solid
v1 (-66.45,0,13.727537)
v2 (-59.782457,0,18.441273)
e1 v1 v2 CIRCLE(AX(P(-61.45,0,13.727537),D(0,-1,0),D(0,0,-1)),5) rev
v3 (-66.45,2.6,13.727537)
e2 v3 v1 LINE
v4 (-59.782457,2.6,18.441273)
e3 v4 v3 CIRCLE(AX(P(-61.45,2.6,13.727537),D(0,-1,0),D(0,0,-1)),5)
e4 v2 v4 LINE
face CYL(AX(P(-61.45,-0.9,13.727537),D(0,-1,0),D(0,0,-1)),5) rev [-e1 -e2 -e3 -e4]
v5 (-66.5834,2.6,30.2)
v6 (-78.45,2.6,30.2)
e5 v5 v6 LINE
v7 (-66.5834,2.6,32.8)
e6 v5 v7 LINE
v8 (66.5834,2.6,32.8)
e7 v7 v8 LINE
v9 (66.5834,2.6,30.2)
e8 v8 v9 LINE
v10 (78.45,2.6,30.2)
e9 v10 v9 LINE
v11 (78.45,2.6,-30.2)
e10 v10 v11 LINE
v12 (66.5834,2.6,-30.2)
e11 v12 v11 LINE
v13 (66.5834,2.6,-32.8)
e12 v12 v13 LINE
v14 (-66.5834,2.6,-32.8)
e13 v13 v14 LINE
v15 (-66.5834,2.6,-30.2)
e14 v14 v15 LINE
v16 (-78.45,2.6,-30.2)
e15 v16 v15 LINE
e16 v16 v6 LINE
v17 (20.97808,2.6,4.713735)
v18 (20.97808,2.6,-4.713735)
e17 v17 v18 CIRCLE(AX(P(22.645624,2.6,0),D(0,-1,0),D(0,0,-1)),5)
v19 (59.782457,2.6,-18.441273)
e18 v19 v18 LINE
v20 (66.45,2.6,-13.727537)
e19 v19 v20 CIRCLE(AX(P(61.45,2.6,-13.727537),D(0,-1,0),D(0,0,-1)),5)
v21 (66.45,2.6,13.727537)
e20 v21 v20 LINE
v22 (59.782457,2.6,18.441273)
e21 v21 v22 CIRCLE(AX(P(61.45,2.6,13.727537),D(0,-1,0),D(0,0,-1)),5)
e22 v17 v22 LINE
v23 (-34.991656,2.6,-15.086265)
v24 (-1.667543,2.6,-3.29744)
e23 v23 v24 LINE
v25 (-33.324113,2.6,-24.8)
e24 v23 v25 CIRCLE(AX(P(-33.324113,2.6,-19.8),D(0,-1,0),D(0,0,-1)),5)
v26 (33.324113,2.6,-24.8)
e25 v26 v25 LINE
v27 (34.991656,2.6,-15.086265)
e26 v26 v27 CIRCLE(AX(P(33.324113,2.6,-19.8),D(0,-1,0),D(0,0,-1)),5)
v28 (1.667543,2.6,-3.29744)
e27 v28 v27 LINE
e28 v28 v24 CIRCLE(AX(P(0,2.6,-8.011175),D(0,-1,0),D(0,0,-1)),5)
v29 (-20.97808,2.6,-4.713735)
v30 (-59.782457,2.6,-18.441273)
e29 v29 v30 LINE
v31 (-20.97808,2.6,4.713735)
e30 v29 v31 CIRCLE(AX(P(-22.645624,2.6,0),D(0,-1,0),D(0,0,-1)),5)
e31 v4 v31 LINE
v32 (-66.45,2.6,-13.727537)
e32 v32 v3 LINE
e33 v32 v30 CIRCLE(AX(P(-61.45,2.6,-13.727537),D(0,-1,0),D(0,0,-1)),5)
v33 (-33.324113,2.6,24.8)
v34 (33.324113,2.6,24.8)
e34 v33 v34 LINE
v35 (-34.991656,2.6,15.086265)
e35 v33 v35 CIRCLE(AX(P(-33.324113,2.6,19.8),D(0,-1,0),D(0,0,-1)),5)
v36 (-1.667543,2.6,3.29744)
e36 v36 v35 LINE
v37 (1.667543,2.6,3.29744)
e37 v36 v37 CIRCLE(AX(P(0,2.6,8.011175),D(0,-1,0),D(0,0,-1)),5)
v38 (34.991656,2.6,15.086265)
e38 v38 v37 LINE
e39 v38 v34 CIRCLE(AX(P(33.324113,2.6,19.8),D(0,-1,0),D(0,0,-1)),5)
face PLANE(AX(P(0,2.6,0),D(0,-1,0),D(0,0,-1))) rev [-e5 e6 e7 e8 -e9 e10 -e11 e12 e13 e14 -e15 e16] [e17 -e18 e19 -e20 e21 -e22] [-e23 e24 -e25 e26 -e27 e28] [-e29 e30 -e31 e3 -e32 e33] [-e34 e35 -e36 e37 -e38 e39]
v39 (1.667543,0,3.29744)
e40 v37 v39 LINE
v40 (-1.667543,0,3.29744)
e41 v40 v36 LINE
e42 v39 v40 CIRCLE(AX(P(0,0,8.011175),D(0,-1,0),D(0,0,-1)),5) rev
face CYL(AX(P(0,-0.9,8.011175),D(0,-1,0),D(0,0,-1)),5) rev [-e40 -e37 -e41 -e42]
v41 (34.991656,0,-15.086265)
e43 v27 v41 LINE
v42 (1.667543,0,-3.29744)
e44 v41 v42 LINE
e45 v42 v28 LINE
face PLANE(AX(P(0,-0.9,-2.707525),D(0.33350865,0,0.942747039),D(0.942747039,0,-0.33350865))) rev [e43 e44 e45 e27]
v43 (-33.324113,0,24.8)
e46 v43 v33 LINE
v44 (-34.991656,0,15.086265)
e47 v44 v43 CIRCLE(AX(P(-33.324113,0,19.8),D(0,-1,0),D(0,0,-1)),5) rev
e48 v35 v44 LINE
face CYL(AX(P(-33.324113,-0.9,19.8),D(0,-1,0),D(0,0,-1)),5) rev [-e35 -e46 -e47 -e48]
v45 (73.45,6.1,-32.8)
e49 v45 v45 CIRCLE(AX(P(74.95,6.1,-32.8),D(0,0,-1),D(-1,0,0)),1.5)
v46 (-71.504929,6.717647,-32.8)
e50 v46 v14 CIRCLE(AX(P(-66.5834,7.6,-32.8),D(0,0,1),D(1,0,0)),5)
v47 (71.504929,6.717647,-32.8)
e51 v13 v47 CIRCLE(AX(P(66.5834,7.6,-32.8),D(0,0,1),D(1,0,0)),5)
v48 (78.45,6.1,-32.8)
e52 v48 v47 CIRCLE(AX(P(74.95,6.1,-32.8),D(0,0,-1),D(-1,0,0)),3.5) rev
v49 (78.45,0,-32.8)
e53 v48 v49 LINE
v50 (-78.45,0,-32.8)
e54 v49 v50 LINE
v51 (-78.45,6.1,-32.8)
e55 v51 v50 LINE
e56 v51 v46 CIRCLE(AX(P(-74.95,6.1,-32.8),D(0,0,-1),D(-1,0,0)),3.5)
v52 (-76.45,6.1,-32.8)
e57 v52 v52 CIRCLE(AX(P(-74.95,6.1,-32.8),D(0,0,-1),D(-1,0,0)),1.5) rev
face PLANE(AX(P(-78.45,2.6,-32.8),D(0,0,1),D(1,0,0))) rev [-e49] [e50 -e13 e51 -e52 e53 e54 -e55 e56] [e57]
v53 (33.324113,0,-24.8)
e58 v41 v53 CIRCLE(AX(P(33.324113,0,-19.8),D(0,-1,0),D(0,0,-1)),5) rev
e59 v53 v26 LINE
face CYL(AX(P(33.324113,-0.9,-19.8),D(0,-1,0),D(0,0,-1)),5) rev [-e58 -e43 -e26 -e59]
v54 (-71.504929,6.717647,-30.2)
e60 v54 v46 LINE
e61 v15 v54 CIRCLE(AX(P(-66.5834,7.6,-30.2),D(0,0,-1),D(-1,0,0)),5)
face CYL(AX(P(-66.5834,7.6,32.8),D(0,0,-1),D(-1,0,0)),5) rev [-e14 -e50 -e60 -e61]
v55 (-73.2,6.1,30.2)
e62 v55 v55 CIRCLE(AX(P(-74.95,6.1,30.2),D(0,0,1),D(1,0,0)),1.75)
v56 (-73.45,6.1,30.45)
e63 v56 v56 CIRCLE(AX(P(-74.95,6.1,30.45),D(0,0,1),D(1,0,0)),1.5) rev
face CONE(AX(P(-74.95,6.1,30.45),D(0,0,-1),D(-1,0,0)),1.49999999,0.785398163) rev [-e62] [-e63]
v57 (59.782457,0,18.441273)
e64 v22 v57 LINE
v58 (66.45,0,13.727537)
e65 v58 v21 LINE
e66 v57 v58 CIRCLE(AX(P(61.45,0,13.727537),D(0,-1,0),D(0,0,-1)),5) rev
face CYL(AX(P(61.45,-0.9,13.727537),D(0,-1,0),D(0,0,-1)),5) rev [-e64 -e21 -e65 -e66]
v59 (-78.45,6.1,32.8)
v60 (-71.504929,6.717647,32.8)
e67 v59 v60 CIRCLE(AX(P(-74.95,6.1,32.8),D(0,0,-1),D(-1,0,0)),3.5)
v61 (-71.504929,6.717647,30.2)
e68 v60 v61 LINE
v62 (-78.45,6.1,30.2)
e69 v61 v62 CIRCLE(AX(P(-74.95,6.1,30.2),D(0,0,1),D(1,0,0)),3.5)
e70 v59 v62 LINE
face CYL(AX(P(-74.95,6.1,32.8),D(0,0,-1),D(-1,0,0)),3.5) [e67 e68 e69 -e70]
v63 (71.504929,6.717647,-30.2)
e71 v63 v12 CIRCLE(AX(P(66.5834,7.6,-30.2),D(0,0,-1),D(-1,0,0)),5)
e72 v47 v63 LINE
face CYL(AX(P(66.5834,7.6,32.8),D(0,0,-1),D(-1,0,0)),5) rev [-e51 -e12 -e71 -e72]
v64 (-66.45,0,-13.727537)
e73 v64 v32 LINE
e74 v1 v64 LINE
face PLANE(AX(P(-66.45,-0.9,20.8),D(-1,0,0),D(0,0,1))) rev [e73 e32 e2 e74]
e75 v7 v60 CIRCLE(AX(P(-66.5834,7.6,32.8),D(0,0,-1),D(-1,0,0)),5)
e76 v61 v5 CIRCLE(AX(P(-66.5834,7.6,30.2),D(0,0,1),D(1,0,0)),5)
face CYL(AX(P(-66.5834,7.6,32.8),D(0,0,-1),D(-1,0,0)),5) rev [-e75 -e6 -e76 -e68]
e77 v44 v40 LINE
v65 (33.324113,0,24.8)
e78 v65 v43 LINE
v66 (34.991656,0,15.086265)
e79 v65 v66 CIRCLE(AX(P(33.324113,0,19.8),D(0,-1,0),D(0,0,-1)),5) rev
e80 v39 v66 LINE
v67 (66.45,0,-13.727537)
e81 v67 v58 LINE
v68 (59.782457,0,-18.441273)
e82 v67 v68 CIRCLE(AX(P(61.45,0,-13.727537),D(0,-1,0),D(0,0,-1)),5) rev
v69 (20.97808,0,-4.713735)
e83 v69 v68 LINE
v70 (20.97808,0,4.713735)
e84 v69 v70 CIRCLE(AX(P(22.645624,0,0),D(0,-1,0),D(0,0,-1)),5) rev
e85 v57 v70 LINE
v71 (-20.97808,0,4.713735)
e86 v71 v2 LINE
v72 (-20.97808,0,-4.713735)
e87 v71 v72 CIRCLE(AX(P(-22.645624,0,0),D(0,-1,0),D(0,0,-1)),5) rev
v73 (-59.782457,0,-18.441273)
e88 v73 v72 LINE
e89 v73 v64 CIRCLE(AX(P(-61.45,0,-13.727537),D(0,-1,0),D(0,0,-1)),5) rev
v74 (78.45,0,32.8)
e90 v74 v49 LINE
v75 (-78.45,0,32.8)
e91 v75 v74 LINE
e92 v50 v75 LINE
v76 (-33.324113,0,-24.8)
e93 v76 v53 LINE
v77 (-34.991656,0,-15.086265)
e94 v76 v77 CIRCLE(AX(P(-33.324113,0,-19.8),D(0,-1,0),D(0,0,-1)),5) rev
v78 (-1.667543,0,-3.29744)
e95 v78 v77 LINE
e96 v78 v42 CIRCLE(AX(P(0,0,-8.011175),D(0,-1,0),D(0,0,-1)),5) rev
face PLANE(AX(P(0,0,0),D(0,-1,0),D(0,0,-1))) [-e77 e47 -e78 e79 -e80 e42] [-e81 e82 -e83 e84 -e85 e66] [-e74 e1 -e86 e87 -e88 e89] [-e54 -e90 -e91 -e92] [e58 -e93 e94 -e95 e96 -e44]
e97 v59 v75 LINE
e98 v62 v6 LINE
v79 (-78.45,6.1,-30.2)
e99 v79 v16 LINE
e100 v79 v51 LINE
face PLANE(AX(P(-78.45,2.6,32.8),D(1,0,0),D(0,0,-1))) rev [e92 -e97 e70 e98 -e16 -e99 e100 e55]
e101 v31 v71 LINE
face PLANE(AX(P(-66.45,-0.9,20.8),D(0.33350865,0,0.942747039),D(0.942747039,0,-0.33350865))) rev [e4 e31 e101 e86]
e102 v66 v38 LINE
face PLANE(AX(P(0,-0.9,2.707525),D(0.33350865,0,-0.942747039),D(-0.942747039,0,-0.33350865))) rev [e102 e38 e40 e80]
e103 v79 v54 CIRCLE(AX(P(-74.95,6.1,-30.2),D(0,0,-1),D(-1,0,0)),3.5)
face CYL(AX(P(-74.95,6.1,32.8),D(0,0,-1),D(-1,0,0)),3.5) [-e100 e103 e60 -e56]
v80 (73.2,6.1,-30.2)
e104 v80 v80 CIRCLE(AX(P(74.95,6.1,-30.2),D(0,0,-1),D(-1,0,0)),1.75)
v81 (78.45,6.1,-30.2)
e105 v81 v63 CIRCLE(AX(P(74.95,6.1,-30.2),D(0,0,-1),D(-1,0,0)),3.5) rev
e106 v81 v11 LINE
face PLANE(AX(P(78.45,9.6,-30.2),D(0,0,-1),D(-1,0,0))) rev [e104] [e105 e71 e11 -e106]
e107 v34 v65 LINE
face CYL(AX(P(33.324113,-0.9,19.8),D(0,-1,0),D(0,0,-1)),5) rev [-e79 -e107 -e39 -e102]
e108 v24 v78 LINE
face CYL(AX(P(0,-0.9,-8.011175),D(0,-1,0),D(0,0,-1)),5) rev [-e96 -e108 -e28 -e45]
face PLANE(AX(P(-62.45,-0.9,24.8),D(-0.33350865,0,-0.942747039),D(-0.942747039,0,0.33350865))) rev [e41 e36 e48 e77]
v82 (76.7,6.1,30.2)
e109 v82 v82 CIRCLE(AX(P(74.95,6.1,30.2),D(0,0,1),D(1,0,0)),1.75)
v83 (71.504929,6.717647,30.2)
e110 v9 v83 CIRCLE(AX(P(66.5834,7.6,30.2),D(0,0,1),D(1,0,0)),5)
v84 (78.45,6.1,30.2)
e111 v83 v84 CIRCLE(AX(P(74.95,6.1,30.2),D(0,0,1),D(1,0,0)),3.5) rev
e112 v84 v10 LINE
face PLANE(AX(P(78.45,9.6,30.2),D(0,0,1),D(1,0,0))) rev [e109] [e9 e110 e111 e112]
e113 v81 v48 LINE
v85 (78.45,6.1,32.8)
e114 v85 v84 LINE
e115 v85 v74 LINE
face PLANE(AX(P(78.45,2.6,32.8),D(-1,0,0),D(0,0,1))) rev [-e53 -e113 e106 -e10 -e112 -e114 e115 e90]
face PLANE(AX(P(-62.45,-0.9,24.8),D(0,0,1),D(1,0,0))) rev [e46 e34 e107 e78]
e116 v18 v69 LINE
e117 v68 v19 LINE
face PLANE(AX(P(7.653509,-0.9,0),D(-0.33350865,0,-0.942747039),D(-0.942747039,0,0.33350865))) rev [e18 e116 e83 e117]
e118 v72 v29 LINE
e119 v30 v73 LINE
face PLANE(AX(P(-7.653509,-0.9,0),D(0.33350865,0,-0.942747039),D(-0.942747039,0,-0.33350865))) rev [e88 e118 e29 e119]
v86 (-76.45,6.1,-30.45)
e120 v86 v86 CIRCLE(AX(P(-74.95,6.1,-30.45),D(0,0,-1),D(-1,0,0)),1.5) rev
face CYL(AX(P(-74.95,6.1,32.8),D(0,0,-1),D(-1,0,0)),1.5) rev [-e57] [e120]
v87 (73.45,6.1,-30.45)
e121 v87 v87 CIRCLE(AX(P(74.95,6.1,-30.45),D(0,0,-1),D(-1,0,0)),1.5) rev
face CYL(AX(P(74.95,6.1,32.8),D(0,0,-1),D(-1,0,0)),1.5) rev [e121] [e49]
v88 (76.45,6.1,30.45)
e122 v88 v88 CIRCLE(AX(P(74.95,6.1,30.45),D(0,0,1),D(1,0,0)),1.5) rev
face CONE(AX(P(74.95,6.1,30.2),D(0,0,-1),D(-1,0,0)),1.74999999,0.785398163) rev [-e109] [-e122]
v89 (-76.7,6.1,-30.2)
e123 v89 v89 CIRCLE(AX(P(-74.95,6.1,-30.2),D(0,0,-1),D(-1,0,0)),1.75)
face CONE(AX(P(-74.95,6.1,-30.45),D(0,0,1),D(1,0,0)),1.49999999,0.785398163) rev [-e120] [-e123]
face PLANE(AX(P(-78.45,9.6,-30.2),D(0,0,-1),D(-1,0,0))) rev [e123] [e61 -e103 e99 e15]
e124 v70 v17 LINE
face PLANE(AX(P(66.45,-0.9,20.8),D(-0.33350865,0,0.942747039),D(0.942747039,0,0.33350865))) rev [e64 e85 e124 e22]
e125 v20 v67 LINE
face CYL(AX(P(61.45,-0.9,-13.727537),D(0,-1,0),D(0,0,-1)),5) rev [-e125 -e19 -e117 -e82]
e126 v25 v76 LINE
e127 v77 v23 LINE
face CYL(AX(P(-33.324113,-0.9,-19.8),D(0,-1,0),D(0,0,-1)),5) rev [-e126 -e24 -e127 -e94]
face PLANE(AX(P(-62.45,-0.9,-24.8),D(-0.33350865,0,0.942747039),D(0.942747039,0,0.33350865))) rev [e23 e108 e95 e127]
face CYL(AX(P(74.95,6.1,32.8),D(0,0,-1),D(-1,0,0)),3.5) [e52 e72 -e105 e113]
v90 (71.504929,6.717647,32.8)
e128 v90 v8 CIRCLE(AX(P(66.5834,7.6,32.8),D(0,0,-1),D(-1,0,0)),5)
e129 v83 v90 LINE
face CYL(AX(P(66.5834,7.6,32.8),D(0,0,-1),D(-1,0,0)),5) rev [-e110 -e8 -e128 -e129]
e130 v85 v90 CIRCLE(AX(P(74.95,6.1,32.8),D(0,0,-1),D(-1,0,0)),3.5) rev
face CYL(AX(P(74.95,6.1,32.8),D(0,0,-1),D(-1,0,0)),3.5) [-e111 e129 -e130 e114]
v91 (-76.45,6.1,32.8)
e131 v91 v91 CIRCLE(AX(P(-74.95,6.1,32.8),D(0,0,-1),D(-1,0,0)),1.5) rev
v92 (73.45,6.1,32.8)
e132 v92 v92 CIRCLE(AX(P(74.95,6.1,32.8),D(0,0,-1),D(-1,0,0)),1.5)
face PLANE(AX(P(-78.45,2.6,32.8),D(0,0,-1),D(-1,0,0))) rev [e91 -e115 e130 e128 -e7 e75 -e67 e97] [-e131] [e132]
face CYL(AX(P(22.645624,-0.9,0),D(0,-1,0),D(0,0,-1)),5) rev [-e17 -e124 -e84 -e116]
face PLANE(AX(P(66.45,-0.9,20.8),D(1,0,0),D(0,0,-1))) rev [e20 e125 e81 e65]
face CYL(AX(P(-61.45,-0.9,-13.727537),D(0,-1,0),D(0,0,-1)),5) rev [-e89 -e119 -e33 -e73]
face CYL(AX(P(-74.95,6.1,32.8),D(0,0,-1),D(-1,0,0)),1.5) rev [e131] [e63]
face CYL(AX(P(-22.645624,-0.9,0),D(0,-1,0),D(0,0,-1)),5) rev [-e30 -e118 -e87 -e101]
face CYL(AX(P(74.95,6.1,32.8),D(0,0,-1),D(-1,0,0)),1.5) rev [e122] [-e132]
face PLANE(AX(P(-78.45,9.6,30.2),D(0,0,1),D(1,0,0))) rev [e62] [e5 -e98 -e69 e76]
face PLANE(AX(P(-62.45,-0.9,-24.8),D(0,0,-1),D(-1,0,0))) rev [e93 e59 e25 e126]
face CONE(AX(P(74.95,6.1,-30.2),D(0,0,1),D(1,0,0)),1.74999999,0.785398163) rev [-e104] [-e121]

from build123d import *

# Parameters (mm, degrees)
SKETCH1_W           = 156.9
SKETCH1_H           = 65.6
BOSS_EXTRUDE1_DEPTH = 2.6
SKETCH2_W           = 7
SKETCH2_H           = 2.6
BOSS_EXTRUDE2_DEPTH = 7
SKETCH3_R           = 1.49999999
CUT_EXTRUDE1_DEPTH  = 103.712815656
FILLET1_R           = 5
CUT_EXTRUDE2_DEPTH  = 3.5
FILLET3_R           = 5
CHAMFER1_SIZE       = 0.25


with BuildPart() as part:
    # Sketch1 → Boss-Extrude1 (new body)
    with BuildSketch(Plane(origin=(0, 0, 0), x_dir=(1, 0, 0), z_dir=(0, 1, 0))):
        Rectangle(SKETCH1_W, SKETCH1_H)
    extrude(amount=BOSS_EXTRUDE1_DEPTH)

    # Sketch2 → Boss-Extrude2 (add)
    with BuildSketch(Plane(origin=(0, 2.6, 0), x_dir=(1, 0, 0), z_dir=(0, 1, 0))):
        with Locations((-74.95, 31.5)):
            Rectangle(SKETCH2_W, SKETCH2_H)
        with Locations((-74.95, -31.5)):
            Rectangle(SKETCH2_W, SKETCH2_H)
        with Locations((74.95, -31.5)):
            Rectangle(SKETCH2_W, SKETCH2_H)
        with Locations((74.95, 31.5)):
            Rectangle(SKETCH2_W, SKETCH2_H)
    extrude(amount=BOSS_EXTRUDE2_DEPTH)

    # Sketch3 → Cut-Extrude1 (cut, through all)
    with BuildSketch(Plane(origin=(0, 0, -32.8), x_dir=(-1, 0, 0), z_dir=(0, 0, -1))):
        with BuildLine():
            Line((-78.45, 9.6), (-78.45, 6.1))
            ThreePointArc((-78.45, 6.1), (-77.424873734, 8.574873734), (-74.95, 9.6))
            Line((-74.95, 9.6), (-78.45, 9.6))
        make_face()
        with BuildLine():
            Line((-71.45, 9.6), (-74.95, 9.6))
            ThreePointArc((-74.95, 9.6), (-72.475126266, 8.574873734), (-71.45, 6.1))
            Line((-71.45, 6.1), (-71.45, 9.6))
        make_face()
        with Locations((74.95, 6.1)):
            Circle(SKETCH3_R)
        with BuildLine():
            Line((74.95, 9.6), (71.45, 9.6))
            Line((71.45, 9.6), (71.45, 6.1))
            ThreePointArc((71.45, 6.1), (72.475126266, 8.574873734), (74.95, 9.6))
        make_face()
        with BuildLine():
            Line((78.45, 9.6), (74.95, 9.6))
            ThreePointArc((74.95, 9.6), (77.424873734, 8.574873734), (78.45, 6.1))
            Line((78.45, 6.1), (78.45, 9.6))
        make_face()
        with Locations((-74.95, 6.1)):
            Circle(SKETCH3_R)
    extrude(amount=-CUT_EXTRUDE1_DEPTH, mode=Mode.SUBTRACT)

    # Fillet1
    # the kernel refuses this fillet: 5 mm, written as the material it adds along each edge
    with BuildSketch(Plane(origin=(-71.45, 2.6, 32.8), x_dir=(1, 0, 0), z_dir=(0, 0, -1))) as fillet1_piece_1:
        with BuildLine():
            CenterArc((4.866600265, -5), FILLET1_R, 90, 79.835751378)
            Line((-0.054929303, -4.117647059), (-0.547082259, -4.029411765))
            ThreePointArc((-0.547082259, -4.029411765), (-0.5, -3.5), (-0.5, 0))
            Line((-0.5, 0), (0, 0.5))
            Line((0, 0.5), (4.866600265, 0.5))
            Line((4.866600265, 0.5), (4.866600265, 0))
        make_face()
    extrude(amount=2.6)
    with BuildSketch(Plane(origin=(71.45, 2.6, 32.8), x_dir=(0.01333878666755776, 0.9999110344276821, 0), z_dir=(0, 0, -1)), Plane(origin=(-71.45, 2.6, -32.8), x_dir=(-0.013338786667550865, 0.9999110344276821, 0), z_dir=(0, 0, 1))) as fillet1_piece_2:
        with BuildLine():
            CenterArc((4.934640629, -4.932861239), FILLET1_R, 99.399969777, 79.835751378)
            Line((-0.064914543, -4.866167305), (-0.56487006, -4.859497912))
            Line((-0.56487006, -4.859497912), (-0.499955517, 0.006669393))
            Line((-0.499955517, 0.006669393), (0.006669393, 0.499955517))
            ThreePointArc((0.006669393, 0.499955517), (3.506358014, 0.453269764), (4.036350699, 0.493286124))
            Line((4.036350699, 0.493286124), (4.11801342, 0))
        make_face()
    extrude(amount=2.6)
    with BuildSketch(Plane(origin=(71.45, 2.6, -32.8), x_dir=(0.01333878666755776, 0.9999110344276821, 0), z_dir=(0, 0, 1))) as fillet1_piece_3:
        with BuildLine():
            CenterArc((4.934640629, 4.932861239), FILLET1_R, 180.764278845, 79.835751378)
            Line((-0.064914543, 4.866167305), (-0.56487006, 4.859497912))
            Line((-0.56487006, 4.859497912), (-0.499955517, -0.006669393))
            Line((-0.499955517, -0.006669393), (0.006669393, -0.499955517))
            ThreePointArc((0.006669393, -0.499955517), (3.506358014, -0.453269764), (4.036350699, -0.493286124))
            Line((4.036350699, -0.493286124), (4.11801342, 0))
        make_face()
    extrude(amount=2.6)

    # Sketch4 → Cut-Extrude2 (cut)
    with BuildSketch(Plane(origin=(0, 2.6, 0), x_dir=(1, 0, 0), z_dir=(0, 1, 0))):
        Polygon((-62.45, -24.8), (0, -2.707525213), (62.45, -24.8), align=None)
        Polygon((-66.45, -20.8), (-66.45, 20.8), (-7.653508772, 0), align=None)
        Polygon((66.45, -20.8), (66.45, 20.8), (7.653508772, 0), align=None)
        Polygon((-62.45, 24.8), (62.45, 24.8), (0, 2.707525213), align=None)
    extrude(amount=-CUT_EXTRUDE2_DEPTH, mode=Mode.SUBTRACT)

    # Fillet3
    fillet3_edges = [part.edges().sort_by_distance(p)[0] for p in [
        (0, 1.3, -2.707525213),
        (-62.45, 1.3, -24.8),
        (62.45, 1.3, -24.8),
        (-7.653508772, 1.3, 0),
        (-66.45, 1.3, 20.8),
        (-66.45, 1.3, -20.8),
        (66.45, 1.3, 20.8),
        (7.653508772, 1.3, 0),
        (66.45, 1.3, -20.8),
        (62.45, 1.3, 24.8),
        (-62.45, 1.3, 24.8),
        (0, 1.3, 2.707525213),
    ]]
    fillet(fillet3_edges, radius=FILLET3_R)

    # Chamfer1
    chamfer1_edges = [part.edges().sort_by_distance(p)[0] for p in [
        (-73.45000001, 6.1, -30.2),
        (-73.45000001, 6.1, 30.2),
        (76.44999999, 6.1, 30.2),
        (76.44999999, 6.1, -30.2),
    ]]
    chamfer(chamfer1_edges, length=CHAMFER1_SIZE)


solid = part.part
